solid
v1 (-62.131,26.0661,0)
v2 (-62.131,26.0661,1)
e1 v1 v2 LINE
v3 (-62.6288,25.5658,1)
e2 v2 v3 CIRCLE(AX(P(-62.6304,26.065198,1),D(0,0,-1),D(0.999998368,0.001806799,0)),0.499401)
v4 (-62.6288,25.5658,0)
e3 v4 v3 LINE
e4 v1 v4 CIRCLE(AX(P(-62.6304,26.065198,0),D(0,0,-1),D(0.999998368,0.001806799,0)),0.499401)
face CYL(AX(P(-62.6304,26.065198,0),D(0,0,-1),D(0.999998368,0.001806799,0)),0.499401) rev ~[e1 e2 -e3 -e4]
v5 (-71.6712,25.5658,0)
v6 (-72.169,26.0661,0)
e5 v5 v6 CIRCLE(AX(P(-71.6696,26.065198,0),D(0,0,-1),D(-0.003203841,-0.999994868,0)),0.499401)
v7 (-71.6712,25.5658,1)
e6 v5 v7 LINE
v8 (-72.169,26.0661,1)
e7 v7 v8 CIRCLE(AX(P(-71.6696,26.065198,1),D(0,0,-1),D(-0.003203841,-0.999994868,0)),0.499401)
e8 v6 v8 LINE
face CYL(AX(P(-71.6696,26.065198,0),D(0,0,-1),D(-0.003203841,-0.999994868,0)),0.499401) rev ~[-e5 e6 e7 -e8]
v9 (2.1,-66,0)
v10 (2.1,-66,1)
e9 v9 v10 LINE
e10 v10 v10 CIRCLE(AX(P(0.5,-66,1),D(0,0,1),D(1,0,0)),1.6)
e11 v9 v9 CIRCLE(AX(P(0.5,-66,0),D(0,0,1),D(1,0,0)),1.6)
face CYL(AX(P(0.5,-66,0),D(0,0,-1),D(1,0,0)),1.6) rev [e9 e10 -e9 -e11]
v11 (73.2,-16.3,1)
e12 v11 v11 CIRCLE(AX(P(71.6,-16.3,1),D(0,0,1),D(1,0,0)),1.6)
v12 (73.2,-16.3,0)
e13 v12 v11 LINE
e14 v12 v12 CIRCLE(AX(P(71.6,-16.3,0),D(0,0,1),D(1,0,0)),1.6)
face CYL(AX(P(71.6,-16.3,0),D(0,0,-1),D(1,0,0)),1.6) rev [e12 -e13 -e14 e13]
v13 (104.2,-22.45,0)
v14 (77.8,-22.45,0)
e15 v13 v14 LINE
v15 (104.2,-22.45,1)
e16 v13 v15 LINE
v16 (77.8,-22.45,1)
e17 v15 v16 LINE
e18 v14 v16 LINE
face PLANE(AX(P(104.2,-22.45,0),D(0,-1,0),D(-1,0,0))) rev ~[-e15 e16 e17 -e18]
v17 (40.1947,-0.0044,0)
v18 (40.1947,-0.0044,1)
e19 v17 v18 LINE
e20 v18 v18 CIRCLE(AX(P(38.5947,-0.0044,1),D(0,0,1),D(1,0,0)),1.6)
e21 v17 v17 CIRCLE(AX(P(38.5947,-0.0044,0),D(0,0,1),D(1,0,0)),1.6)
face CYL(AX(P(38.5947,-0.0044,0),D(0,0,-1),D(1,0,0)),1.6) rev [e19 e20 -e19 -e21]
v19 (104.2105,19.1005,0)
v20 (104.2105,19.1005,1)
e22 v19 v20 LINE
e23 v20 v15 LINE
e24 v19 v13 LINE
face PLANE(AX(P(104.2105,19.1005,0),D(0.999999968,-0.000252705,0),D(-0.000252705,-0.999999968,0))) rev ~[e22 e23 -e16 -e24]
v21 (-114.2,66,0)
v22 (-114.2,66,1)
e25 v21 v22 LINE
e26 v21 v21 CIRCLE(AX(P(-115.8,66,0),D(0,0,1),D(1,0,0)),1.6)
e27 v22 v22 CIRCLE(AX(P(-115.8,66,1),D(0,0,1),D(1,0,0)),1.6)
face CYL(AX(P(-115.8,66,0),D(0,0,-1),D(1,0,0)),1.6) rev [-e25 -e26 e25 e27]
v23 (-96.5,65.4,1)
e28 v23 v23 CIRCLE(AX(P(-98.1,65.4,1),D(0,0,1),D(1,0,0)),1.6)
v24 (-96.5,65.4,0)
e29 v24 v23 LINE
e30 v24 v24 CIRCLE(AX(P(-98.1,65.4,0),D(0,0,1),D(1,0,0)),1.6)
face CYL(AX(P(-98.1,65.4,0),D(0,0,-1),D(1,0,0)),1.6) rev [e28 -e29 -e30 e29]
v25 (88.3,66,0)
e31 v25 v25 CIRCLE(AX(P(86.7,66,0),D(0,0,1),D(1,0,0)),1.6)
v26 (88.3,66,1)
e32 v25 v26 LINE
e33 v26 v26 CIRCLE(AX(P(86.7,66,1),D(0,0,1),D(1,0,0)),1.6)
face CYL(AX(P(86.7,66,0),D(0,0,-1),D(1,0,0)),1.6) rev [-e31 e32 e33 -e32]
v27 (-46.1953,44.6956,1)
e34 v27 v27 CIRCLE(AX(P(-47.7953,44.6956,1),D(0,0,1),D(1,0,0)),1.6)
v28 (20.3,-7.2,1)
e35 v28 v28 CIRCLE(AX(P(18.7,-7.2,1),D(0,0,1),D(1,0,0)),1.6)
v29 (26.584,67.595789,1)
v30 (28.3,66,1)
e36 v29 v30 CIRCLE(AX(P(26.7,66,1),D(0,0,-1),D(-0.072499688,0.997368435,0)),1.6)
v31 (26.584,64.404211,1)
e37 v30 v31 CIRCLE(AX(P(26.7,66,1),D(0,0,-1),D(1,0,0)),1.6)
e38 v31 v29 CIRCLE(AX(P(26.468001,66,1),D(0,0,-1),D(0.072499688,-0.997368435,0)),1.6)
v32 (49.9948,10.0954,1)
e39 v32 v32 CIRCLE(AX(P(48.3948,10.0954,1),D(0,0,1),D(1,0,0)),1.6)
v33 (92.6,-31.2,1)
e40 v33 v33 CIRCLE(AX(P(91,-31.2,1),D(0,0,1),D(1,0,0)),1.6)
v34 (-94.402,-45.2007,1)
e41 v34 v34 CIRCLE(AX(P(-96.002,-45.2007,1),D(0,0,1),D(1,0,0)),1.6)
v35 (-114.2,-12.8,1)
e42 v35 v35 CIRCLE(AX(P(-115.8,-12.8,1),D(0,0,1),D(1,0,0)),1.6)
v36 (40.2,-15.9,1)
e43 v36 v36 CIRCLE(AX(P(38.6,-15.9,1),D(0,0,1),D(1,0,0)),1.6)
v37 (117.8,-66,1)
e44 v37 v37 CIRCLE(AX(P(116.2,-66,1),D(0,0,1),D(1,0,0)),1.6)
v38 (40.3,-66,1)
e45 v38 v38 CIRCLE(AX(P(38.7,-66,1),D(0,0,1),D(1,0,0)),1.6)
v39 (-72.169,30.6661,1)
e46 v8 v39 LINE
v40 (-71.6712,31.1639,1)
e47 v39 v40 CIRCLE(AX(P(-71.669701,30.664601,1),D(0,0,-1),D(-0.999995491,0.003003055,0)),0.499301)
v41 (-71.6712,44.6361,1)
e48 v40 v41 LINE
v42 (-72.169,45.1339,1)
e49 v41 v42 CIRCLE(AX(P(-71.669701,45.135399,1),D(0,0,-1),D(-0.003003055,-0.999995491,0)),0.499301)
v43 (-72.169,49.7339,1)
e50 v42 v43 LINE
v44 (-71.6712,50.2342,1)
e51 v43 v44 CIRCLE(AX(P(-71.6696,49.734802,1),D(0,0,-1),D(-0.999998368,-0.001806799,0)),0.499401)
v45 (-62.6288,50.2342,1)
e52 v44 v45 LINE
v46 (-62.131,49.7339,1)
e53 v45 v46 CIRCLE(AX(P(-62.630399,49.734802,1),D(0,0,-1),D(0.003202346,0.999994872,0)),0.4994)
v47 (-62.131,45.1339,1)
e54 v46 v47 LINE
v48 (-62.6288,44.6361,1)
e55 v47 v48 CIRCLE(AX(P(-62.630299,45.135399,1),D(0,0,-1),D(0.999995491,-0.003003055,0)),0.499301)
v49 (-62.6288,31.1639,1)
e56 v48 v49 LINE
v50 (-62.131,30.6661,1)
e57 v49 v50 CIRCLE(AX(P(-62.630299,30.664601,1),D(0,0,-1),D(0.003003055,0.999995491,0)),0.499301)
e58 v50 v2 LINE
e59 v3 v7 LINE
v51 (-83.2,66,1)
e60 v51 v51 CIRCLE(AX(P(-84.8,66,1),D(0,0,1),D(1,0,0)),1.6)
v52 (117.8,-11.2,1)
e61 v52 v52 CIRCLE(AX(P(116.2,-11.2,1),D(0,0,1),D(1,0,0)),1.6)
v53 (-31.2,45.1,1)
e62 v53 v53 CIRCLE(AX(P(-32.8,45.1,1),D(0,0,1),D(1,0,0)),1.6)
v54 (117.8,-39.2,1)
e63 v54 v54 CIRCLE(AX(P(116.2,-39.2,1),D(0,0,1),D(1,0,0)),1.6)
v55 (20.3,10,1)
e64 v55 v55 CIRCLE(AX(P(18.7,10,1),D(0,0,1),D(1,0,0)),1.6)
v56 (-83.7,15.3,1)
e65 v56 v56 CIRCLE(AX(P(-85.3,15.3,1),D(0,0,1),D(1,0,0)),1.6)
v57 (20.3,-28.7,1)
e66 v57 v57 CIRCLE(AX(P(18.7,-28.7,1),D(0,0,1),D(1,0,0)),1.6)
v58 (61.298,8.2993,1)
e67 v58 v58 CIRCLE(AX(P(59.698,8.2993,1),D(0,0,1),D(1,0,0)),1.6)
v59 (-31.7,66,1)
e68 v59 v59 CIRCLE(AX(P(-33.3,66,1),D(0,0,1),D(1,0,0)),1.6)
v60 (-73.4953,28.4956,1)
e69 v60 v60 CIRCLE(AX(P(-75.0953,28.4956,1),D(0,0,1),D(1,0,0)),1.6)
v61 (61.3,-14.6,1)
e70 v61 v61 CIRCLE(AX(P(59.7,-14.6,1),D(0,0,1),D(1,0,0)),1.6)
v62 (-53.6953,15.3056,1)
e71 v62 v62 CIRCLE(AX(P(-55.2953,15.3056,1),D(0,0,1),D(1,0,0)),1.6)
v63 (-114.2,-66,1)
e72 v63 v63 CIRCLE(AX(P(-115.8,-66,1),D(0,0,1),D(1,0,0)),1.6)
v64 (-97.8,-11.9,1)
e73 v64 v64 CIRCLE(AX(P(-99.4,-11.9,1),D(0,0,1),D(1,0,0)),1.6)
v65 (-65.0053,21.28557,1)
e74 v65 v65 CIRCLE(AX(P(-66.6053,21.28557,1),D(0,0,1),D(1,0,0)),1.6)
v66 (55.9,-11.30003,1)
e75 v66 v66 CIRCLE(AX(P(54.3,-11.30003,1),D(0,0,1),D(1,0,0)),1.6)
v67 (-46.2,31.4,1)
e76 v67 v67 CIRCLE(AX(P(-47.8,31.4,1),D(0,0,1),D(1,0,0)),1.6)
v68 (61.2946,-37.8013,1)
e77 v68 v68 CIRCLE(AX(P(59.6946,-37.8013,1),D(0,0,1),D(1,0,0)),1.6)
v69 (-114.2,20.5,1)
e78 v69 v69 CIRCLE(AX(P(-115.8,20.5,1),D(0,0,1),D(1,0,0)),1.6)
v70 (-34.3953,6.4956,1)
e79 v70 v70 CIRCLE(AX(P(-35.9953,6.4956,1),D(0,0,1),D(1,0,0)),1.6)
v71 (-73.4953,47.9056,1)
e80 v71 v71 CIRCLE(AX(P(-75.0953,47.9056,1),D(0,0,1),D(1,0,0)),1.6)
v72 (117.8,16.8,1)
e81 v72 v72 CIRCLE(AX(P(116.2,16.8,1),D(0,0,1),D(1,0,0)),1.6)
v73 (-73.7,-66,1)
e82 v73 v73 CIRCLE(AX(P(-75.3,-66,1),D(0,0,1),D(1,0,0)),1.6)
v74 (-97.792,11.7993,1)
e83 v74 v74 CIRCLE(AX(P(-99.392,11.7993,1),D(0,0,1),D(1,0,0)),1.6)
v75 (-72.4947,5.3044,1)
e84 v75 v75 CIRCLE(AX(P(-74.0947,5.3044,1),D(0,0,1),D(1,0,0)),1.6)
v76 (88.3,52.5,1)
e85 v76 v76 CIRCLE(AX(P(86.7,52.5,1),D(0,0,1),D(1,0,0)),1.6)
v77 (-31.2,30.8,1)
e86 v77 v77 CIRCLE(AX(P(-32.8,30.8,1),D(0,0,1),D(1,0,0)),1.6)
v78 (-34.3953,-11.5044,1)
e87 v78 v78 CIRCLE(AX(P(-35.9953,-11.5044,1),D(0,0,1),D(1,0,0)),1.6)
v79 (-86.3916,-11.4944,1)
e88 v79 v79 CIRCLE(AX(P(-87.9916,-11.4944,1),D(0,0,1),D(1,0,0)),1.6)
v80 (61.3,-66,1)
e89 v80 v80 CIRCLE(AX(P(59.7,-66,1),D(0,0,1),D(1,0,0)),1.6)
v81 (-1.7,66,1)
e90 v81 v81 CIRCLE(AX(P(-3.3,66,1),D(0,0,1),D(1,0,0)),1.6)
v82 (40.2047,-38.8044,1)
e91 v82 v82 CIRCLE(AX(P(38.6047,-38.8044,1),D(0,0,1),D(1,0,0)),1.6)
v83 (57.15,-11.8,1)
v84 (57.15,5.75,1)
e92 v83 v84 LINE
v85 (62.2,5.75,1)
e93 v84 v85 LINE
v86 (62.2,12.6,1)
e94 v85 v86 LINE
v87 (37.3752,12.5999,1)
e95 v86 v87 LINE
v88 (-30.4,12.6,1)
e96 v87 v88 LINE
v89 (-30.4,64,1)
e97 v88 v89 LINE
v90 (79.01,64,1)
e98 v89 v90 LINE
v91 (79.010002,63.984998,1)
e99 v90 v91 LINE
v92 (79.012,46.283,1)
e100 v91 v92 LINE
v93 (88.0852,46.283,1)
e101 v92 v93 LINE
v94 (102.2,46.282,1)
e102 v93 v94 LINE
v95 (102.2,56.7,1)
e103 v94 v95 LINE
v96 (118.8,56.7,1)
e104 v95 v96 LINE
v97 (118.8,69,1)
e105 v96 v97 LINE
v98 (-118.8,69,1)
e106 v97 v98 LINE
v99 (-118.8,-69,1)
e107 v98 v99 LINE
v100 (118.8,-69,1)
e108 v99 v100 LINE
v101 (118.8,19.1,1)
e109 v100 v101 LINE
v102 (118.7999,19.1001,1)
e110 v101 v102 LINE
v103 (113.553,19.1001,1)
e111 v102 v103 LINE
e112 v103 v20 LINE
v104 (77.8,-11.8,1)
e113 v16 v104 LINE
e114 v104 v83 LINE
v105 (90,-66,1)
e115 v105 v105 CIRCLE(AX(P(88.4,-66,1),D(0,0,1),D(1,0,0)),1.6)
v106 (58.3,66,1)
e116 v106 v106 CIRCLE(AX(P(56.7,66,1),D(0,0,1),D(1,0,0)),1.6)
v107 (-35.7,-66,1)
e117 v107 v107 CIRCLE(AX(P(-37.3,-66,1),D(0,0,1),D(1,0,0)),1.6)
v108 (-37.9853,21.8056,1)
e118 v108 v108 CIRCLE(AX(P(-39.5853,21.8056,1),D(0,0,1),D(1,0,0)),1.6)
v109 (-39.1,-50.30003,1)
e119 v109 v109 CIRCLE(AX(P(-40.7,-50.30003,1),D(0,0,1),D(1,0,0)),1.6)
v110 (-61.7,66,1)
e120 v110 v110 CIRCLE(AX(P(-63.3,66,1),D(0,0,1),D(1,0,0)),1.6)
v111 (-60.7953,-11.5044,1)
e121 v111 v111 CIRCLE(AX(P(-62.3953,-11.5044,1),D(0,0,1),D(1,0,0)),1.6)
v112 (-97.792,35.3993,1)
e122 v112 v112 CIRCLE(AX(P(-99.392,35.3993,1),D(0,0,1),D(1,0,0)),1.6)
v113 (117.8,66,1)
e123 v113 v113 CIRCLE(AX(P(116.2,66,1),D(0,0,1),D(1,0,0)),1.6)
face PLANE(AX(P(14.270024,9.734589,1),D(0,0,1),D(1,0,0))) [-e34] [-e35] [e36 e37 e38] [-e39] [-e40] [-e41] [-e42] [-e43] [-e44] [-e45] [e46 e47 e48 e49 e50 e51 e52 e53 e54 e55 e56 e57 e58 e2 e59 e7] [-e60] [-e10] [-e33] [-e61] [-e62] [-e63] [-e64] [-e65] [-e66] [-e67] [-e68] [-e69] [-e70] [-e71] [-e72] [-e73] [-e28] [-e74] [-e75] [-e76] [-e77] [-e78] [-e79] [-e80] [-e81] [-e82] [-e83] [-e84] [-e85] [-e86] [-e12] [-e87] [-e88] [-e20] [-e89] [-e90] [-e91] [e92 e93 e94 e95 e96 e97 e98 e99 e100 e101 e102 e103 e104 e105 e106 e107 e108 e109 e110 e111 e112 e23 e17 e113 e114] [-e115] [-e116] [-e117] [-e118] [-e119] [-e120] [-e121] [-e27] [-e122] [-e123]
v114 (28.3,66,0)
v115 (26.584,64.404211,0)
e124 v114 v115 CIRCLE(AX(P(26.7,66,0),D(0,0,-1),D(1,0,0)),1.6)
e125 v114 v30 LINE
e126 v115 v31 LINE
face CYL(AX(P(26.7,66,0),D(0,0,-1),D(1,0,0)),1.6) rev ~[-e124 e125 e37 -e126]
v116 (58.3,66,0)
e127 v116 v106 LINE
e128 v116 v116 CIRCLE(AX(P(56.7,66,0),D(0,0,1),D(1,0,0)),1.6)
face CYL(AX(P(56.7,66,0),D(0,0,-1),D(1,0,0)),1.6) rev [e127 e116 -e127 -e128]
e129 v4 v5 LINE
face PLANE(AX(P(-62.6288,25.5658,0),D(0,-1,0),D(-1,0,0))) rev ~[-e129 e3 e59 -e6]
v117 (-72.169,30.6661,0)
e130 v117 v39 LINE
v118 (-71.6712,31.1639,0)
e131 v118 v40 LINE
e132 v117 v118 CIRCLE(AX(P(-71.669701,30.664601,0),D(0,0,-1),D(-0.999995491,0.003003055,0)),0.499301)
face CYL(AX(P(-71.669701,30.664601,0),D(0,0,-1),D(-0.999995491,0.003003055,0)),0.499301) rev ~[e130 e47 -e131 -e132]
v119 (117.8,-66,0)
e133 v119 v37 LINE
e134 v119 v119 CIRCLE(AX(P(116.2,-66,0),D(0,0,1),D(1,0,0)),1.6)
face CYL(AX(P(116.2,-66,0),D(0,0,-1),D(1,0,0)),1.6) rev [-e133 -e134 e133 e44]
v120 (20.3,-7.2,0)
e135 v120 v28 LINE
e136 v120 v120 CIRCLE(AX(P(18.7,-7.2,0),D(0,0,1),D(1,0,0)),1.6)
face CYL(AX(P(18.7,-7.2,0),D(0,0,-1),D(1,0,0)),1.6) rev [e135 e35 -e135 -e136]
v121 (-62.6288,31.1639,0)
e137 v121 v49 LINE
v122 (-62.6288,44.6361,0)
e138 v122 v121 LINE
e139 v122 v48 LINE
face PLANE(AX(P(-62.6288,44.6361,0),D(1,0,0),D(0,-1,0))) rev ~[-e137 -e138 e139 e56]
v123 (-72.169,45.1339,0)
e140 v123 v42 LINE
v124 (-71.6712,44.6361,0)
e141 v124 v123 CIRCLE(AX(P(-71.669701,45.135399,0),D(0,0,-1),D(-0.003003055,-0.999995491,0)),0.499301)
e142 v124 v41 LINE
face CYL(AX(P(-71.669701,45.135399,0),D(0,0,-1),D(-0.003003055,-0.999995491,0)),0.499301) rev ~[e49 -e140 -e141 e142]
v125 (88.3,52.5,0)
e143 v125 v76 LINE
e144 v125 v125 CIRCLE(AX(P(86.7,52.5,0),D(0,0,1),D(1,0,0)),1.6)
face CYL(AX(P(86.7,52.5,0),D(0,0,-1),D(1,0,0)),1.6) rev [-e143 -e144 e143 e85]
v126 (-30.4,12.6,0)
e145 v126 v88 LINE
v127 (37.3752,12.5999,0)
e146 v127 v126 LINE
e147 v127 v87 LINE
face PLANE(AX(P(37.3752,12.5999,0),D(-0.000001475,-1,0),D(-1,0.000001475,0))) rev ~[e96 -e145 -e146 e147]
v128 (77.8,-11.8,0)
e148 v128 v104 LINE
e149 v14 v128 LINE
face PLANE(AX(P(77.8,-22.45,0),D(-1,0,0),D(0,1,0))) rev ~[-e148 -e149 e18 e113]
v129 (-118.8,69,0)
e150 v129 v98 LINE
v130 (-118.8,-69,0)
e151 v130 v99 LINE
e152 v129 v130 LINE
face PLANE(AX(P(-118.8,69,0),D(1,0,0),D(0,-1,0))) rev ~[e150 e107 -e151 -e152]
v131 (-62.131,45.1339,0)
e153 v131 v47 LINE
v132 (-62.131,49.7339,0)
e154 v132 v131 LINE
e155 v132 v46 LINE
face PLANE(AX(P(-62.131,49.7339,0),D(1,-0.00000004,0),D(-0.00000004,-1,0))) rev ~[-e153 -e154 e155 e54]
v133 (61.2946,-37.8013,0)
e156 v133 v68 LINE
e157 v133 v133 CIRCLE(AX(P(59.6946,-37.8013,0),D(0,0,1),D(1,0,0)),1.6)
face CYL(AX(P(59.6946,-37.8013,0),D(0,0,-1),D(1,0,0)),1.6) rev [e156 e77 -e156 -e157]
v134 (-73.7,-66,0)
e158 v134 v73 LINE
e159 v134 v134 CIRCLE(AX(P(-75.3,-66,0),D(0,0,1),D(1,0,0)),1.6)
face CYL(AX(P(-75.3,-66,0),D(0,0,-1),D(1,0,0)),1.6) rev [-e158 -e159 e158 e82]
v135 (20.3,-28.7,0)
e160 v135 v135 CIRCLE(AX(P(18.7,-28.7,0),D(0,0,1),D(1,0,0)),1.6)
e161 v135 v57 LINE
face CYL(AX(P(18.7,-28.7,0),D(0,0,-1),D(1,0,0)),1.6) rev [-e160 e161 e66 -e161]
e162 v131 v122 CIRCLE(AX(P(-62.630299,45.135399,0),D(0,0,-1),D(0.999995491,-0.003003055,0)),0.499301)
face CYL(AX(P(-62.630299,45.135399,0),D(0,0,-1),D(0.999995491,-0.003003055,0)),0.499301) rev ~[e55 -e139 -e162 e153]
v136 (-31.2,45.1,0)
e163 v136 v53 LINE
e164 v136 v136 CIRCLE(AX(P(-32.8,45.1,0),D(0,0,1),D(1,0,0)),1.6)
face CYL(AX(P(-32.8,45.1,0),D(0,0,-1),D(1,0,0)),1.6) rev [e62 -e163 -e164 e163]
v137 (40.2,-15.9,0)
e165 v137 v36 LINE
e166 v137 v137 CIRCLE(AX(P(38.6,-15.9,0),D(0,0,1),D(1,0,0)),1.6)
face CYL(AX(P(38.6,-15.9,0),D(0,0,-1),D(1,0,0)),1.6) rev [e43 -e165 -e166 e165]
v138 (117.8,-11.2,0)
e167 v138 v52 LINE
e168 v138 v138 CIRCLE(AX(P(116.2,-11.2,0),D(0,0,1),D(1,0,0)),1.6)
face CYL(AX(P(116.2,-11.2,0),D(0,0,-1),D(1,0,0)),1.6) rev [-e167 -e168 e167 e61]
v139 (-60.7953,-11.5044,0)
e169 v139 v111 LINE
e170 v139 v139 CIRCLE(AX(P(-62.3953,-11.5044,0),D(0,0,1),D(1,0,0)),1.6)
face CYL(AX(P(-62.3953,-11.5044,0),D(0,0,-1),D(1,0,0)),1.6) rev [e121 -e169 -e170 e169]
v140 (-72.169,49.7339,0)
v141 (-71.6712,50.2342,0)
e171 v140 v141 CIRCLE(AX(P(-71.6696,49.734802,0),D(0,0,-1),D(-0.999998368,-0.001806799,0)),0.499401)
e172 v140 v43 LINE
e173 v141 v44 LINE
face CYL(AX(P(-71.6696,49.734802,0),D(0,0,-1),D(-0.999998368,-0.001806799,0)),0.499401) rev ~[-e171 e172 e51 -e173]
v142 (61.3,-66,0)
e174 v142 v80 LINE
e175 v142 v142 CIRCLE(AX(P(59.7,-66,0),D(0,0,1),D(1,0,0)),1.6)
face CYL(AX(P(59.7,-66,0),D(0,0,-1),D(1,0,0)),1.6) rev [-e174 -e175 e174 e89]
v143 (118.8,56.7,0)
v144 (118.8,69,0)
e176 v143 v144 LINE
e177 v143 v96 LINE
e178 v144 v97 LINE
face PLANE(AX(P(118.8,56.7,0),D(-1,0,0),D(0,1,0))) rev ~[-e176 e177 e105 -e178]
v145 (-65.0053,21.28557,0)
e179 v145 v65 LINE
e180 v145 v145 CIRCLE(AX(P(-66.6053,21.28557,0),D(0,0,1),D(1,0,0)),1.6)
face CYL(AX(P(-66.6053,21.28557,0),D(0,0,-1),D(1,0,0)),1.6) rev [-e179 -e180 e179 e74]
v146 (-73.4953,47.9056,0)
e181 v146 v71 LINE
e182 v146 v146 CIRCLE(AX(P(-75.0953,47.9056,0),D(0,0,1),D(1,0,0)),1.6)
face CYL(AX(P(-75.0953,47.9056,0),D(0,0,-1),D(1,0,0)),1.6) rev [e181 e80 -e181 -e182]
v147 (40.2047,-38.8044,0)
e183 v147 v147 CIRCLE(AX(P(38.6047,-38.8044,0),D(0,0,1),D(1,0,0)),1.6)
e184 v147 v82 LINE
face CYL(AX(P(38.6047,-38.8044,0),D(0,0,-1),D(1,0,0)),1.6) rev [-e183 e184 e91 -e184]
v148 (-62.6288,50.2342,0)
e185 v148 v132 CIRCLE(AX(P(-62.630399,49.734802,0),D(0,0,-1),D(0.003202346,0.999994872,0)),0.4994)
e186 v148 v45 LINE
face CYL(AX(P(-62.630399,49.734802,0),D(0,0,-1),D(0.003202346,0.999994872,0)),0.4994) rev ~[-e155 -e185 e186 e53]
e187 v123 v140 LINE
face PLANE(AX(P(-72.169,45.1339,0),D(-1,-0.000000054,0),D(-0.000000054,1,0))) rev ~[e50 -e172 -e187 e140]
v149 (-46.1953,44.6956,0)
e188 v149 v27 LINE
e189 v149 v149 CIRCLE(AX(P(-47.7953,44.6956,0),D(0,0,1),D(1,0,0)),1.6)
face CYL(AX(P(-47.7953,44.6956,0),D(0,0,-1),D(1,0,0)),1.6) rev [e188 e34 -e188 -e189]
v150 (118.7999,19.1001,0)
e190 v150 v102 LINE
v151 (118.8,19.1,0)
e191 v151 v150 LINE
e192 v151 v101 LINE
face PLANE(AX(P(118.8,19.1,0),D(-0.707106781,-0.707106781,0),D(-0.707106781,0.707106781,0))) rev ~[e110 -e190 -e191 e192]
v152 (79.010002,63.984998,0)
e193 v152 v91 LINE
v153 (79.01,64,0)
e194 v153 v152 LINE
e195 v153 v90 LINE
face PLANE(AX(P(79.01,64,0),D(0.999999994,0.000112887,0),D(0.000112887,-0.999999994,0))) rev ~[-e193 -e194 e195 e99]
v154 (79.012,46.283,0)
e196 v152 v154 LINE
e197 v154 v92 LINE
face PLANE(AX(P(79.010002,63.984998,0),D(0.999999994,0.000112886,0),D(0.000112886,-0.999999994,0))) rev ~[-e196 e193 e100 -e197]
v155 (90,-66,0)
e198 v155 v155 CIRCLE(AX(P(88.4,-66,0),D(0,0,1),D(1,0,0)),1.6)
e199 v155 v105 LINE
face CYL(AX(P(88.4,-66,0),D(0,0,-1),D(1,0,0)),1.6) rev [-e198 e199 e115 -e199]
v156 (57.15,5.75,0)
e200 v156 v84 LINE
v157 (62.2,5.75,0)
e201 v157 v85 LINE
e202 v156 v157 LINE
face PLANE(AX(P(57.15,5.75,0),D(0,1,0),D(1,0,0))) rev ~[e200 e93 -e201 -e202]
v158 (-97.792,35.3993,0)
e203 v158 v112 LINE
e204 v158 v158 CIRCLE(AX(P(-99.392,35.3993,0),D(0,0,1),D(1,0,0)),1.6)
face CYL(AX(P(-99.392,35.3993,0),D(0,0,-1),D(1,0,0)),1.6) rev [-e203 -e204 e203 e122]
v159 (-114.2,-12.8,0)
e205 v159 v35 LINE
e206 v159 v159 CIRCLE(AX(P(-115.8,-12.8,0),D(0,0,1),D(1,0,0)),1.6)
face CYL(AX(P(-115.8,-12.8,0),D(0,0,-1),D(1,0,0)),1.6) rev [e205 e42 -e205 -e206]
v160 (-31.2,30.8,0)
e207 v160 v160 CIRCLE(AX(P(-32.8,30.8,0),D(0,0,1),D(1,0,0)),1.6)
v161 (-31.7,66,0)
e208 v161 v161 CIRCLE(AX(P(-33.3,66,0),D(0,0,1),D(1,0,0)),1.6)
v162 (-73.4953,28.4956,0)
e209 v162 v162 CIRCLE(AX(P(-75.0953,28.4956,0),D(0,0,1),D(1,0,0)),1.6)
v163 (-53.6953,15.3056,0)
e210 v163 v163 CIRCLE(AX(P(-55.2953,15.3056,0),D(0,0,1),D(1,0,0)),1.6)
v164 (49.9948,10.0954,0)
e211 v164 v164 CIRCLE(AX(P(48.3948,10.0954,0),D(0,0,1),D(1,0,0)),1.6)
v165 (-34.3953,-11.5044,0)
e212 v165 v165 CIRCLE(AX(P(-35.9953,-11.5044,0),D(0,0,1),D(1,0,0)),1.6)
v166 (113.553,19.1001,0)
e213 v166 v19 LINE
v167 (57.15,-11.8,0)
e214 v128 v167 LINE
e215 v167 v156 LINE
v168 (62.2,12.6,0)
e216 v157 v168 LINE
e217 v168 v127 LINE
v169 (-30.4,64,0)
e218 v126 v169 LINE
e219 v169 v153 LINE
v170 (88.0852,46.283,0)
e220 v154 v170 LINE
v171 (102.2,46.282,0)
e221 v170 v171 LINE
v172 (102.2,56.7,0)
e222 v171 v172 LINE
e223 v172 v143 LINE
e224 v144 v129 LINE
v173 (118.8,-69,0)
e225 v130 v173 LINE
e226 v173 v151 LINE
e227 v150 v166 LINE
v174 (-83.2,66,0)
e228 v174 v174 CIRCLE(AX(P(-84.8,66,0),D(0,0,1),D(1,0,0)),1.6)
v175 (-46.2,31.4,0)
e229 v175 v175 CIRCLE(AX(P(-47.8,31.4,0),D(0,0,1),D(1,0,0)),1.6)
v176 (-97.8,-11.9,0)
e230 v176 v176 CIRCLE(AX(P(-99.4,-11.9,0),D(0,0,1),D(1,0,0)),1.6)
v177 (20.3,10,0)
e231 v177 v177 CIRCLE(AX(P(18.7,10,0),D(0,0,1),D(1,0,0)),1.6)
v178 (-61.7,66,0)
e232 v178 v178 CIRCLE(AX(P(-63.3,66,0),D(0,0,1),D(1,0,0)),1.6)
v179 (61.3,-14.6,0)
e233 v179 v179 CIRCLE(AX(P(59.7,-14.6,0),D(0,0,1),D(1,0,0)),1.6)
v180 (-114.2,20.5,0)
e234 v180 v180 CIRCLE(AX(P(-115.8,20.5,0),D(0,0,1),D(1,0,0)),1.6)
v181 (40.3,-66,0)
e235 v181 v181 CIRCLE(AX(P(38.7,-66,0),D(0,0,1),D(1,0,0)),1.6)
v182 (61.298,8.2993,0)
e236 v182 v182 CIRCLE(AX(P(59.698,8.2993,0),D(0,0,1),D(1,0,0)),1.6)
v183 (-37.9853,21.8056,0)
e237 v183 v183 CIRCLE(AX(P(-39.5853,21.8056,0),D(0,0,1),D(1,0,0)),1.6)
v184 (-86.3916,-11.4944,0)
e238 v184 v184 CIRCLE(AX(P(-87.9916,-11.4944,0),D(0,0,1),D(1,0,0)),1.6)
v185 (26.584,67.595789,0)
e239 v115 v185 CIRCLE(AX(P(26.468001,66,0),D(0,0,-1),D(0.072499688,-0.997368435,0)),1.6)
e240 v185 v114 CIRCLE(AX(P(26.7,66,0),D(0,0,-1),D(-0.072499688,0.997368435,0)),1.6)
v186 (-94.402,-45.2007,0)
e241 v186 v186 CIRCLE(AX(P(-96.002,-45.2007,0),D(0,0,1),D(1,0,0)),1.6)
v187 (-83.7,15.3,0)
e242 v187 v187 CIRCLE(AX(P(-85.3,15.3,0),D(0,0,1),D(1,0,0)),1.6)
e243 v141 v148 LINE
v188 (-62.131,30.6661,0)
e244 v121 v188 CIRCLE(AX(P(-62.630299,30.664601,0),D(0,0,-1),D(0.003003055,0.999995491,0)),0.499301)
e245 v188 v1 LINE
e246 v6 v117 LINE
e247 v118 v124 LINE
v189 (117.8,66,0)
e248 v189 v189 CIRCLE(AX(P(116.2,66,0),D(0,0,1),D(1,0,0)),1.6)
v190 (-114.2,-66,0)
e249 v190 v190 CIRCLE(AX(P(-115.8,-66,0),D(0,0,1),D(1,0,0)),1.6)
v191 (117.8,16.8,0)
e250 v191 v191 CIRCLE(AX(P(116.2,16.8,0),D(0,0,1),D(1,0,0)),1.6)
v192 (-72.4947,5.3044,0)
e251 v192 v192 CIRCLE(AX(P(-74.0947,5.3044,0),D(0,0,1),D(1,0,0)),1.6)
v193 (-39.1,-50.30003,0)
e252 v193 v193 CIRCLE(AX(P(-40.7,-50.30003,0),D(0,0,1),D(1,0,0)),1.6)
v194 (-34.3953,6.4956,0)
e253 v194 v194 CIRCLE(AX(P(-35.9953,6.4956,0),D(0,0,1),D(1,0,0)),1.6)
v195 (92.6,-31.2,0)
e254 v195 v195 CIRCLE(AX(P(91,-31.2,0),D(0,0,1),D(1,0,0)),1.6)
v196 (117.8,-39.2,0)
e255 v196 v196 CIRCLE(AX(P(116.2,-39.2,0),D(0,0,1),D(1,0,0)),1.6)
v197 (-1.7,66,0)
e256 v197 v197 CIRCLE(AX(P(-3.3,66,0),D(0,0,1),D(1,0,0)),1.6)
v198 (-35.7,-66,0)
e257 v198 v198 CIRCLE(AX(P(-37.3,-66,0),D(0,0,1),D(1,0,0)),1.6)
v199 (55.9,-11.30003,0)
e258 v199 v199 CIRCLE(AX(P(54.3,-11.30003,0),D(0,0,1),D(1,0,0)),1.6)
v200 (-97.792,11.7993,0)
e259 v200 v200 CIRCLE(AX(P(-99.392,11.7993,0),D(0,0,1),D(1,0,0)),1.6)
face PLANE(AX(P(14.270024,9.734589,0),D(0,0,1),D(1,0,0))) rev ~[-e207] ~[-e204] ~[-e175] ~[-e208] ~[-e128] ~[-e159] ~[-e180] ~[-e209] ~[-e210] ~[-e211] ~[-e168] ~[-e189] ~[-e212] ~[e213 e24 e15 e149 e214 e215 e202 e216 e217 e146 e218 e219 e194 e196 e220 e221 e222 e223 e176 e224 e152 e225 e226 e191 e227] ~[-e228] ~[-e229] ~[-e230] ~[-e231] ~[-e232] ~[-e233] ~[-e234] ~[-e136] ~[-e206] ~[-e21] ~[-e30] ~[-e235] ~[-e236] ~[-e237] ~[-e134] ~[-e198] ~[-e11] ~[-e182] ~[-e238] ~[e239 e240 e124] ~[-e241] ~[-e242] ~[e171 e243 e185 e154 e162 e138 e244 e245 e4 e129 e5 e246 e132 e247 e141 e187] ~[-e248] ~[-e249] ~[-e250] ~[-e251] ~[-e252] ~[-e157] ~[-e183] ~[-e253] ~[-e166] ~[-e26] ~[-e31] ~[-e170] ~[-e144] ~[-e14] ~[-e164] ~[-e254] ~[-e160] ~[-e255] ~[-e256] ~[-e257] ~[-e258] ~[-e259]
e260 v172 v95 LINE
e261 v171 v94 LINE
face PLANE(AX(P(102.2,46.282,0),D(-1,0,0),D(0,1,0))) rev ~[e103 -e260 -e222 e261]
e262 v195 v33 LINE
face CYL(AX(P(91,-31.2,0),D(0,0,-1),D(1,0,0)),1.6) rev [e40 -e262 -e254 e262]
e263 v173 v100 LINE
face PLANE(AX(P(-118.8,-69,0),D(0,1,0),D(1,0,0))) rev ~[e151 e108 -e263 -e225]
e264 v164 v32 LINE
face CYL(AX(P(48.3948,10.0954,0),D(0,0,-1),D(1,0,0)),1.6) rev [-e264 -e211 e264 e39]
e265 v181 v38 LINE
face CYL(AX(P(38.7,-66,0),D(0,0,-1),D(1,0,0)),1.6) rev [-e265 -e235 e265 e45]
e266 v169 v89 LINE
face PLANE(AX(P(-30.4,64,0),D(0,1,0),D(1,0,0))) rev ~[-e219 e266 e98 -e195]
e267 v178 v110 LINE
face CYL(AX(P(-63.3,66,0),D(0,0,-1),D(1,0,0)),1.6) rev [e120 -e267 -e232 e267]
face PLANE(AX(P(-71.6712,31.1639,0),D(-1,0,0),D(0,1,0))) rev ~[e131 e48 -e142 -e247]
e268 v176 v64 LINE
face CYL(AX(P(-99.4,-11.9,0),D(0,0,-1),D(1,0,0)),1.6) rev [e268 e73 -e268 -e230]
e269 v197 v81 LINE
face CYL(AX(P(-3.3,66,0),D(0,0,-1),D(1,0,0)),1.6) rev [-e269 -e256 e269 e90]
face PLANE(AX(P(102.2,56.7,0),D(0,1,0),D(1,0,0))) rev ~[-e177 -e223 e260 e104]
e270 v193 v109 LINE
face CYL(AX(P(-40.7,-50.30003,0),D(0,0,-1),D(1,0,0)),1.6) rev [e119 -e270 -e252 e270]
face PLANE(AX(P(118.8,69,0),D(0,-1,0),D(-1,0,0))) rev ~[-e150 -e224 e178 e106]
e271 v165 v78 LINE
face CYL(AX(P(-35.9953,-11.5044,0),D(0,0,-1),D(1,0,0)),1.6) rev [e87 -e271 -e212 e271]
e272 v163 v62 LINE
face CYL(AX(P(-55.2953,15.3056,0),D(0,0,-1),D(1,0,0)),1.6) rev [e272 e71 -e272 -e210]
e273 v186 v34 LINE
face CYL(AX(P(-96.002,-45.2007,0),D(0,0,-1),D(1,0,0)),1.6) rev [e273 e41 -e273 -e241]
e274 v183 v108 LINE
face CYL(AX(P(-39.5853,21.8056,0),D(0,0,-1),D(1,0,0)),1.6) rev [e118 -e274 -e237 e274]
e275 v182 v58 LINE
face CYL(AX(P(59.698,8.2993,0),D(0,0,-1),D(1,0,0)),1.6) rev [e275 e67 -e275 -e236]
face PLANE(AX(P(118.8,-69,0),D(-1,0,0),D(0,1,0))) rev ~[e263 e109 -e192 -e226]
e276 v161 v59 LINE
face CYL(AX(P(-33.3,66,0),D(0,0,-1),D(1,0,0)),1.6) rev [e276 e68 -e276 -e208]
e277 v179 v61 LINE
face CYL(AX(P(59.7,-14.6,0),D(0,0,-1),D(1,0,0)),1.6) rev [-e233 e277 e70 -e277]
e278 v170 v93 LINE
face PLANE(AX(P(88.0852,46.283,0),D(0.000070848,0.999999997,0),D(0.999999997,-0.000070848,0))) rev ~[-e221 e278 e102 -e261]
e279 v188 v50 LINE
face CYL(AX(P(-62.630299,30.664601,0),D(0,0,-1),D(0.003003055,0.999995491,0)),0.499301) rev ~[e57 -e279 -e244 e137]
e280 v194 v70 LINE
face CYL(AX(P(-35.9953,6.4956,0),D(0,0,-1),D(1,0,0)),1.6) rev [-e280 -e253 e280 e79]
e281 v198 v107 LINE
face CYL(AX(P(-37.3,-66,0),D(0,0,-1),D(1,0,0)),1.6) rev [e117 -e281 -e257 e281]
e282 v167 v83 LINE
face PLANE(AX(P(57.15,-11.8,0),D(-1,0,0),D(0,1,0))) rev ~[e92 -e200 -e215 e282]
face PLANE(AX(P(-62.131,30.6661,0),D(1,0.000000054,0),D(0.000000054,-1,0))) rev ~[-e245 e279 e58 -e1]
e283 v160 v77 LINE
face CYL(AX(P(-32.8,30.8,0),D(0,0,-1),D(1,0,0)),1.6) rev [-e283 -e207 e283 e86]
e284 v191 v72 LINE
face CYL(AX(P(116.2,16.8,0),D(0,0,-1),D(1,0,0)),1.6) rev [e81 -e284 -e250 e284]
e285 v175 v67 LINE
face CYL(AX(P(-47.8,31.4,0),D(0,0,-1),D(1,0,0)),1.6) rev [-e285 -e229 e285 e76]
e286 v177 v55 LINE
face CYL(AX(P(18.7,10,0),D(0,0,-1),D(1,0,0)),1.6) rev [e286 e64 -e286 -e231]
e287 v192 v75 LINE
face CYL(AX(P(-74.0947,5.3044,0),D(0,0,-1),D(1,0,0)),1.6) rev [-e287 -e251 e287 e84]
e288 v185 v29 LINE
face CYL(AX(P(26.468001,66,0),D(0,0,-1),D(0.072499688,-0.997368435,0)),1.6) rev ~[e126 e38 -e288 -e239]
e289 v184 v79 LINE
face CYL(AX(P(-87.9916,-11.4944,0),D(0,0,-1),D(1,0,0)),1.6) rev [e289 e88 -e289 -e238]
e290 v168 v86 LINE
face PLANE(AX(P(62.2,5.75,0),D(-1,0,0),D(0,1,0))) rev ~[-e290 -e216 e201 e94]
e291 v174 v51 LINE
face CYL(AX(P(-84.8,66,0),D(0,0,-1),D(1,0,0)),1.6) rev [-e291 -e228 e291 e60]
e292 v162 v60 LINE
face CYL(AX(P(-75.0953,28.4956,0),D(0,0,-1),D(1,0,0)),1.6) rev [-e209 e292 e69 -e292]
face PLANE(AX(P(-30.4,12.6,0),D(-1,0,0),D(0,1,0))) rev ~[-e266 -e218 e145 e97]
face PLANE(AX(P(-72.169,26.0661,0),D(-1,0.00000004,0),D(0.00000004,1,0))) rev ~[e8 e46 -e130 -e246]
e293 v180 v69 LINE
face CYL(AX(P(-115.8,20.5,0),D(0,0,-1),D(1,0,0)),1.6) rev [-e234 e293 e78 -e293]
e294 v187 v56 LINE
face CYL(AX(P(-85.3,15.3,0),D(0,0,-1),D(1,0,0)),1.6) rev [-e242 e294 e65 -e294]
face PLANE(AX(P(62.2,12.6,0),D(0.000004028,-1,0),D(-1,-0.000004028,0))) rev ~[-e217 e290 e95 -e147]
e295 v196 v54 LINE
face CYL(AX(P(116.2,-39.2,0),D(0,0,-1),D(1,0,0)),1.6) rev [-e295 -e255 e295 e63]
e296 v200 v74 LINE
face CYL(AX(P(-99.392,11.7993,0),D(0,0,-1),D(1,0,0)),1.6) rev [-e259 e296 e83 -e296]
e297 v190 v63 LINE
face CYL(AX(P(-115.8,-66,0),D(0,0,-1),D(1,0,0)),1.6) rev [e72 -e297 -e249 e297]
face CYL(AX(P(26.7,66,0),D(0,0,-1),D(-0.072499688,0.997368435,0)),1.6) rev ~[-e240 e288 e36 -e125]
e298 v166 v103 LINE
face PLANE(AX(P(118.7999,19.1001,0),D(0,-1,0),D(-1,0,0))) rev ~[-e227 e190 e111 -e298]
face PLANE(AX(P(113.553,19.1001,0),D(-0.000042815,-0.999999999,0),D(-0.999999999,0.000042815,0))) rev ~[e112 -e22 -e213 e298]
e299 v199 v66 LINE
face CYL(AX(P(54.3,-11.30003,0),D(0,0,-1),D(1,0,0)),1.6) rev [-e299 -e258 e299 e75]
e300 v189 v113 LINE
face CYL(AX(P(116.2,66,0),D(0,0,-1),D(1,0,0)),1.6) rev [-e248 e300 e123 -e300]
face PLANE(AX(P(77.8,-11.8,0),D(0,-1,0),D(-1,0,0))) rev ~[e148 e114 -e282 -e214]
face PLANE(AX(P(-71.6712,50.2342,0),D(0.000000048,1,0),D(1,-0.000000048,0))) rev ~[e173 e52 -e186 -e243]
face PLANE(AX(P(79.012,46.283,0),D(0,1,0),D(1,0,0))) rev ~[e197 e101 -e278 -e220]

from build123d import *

# Parameters (mm, degrees)
F0_R     = 1.6
F1_DEPTH = 1


# Not quite as in the source:
# - ends of sketch curves that miss each other by under 0.0002 mm in the source are joined


with BuildPart() as f1:
    # F0 (on Top) → F1 (new body)
    with BuildSketch(Plane.XY):
        Polygon((102.2, 56.7), (113.5, 56.7), (118.8, 56.7), (118.8, 69), (-118.8, 69), (-118.8, -69), (118.8, -69), (118.8, 19.1), (118.7999, 19.1001), (113.553, 19.1001), (104.2105, 19.1005), (104.2, -22.45), (88.8825, -22.45), (77.8, -22.45), (77.8, -11.8), (57.15, -11.8), (57.15, 5.75), (62.2, 5.75), (62.2, 12.6), (37.3752, 12.5999), (-30.4, 12.6), (-30.4, 64), (37.3639, 64), (61.18, 64), (78.995, 64), (79.01, 64), (79.0100016935, 63.9849983065), (79.012, 46.283), (88.0852, 46.283), (102.2, 46.282), align=None)
        with Locations((-115.8, -66)):
            Circle(F0_R, mode=Mode.SUBTRACT)
        with Locations((-75.3, -66)):
            Circle(F0_R, mode=Mode.SUBTRACT)
        with Locations((-96.002, -45.2007)):
            Circle(F0_R, mode=Mode.SUBTRACT)
        with Locations((-37.3, -66)):
            Circle(F0_R, mode=Mode.SUBTRACT)
        with Locations((-40.7, -50.30003)):
            Circle(F0_R, mode=Mode.SUBTRACT)
        with Locations((-115.8, -12.8)):
            Circle(F0_R, mode=Mode.SUBTRACT)
        with Locations((-99.4, -11.9)):
            Circle(F0_R, mode=Mode.SUBTRACT)
        with Locations((-87.9916, -11.4944)):
            Circle(F0_R, mode=Mode.SUBTRACT)
        with Locations((-62.3953, -11.5044)):
            Circle(F0_R, mode=Mode.SUBTRACT)
        with Locations((-35.9953, -11.5044)):
            Circle(F0_R, mode=Mode.SUBTRACT)
        with Locations((0.5, -66)):
            Circle(F0_R, mode=Mode.SUBTRACT)
        with Locations((38.7, -66)):
            Circle(F0_R, mode=Mode.SUBTRACT)
        with Locations((38.6047, -38.8044)):
            Circle(F0_R, mode=Mode.SUBTRACT)
        with Locations((59.7, -66)):
            Circle(F0_R, mode=Mode.SUBTRACT)
        with Locations((88.4, -66)):
            Circle(F0_R, mode=Mode.SUBTRACT)
        with Locations((116.2, -66)):
            Circle(F0_R, mode=Mode.SUBTRACT)
        with Locations((59.6946, -37.8013)):
            Circle(F0_R, mode=Mode.SUBTRACT)
        with Locations((116.2, -39.2)):
            Circle(F0_R, mode=Mode.SUBTRACT)
        with Locations((18.7, -28.7)):
            Circle(F0_R, mode=Mode.SUBTRACT)
        with Locations((18.7, -7.2)):
            Circle(F0_R, mode=Mode.SUBTRACT)
        with Locations((38.6, -15.9)):
            Circle(F0_R, mode=Mode.SUBTRACT)
        with Locations((54.3, -11.30003)):
            Circle(F0_R, mode=Mode.SUBTRACT)
        with Locations((38.5947, -0.0044)):
            Circle(F0_R, mode=Mode.SUBTRACT)
        with Locations((91, -31.2)):
            Circle(F0_R, mode=Mode.SUBTRACT)
        with Locations((59.7, -14.6)):
            Circle(F0_R, mode=Mode.SUBTRACT)
        with Locations((71.6, -16.3)):
            Circle(F0_R, mode=Mode.SUBTRACT)
        with Locations((116.2, -11.2)):
            Circle(F0_R, mode=Mode.SUBTRACT)
        with Locations((-99.392, 11.7993)):
            Circle(F0_R, mode=Mode.SUBTRACT)
        with Locations((-74.0947, 5.3044)):
            Circle(F0_R, mode=Mode.SUBTRACT)
        with Locations((-85.3, 15.3)):
            Circle(F0_R, mode=Mode.SUBTRACT)
        with Locations((-115.8, 20.5)):
            Circle(F0_R, mode=Mode.SUBTRACT)
        with Locations((-66.6053, 21.28557)):
            Circle(F0_R, mode=Mode.SUBTRACT)
        with Locations((-75.0953, 28.4956)):
            Circle(F0_R, mode=Mode.SUBTRACT)
        with Locations((-35.9953, 6.4956)):
            Circle(F0_R, mode=Mode.SUBTRACT)
        with Locations((-55.2953, 15.3056)):
            Circle(F0_R, mode=Mode.SUBTRACT)
        with Locations((-39.5853, 21.8056)):
            Circle(F0_R, mode=Mode.SUBTRACT)
        with Locations((-47.8, 31.4)):
            Circle(F0_R, mode=Mode.SUBTRACT)
        with Locations((-32.8, 30.8)):
            Circle(F0_R, mode=Mode.SUBTRACT)
        with Locations((-99.392, 35.3993)):
            Circle(F0_R, mode=Mode.SUBTRACT)
        with BuildLine():
            ThreePointArc((-71.6712000014, 25.5657995631), (-72.0236133171, 25.7129538657), (-72.1690001854, 26.0661000003))
            Line((-72.1690001854, 26.0661000003), (-72.169, 30.6661))
            ThreePointArc((-72.169, 30.6661), (-72.022760123, 31.017660123), (-71.6711999992, 31.1638997499))
            Line((-71.6711999992, 31.1638997499), (-71.6712, 44.6361))
            ThreePointArc((-71.6712, 44.6361), (-72.022760123, 44.782339877), (-72.1689997499, 45.1339000008))
            Line((-72.1689997499, 45.1339000008), (-72.169, 49.7339))
            ThreePointArc((-72.169, 49.7339), (-72.0236133171, 50.0870461343), (-71.6712000014, 50.2342004369))
            Line((-71.6712000014, 50.2342004369), (-62.6288, 50.2342))
            ThreePointArc((-62.6288, 50.2342), (-62.2763866829, 50.0870461343), (-62.1309998146, 49.7338999997))
            Line((-62.1309998146, 49.7338999997), (-62.131, 45.1339))
            ThreePointArc((-62.131, 45.1339), (-62.277239877, 44.782339877), (-62.6288000008, 44.6361002501))
            Line((-62.6288000008, 44.6361002501), (-62.6288, 31.1639))
            ThreePointArc((-62.6288, 31.1639), (-62.277239877, 31.017660123), (-62.1310002501, 30.6660999992))
            Line((-62.1310002501, 30.6660999992), (-62.131, 26.0661))
            ThreePointArc((-62.131, 26.0661), (-62.2763866829, 25.7129538657), (-62.6287999986, 25.5657995631))
            Line((-62.6287999986, 25.5657995631), (-71.6712000014, 25.5657995631))
        make_face(mode=Mode.SUBTRACT)
        with Locations((-75.0953, 47.9056)):
            Circle(F0_R, mode=Mode.SUBTRACT)
        with Locations((-115.8, 66)):
            Circle(F0_R, mode=Mode.SUBTRACT)
        with Locations((-98.1, 65.4)):
            Circle(F0_R, mode=Mode.SUBTRACT)
        with Locations((-84.8, 66)):
            Circle(F0_R, mode=Mode.SUBTRACT)
        with Locations((-63.3, 66)):
            Circle(F0_R, mode=Mode.SUBTRACT)
        with Locations((-47.7953, 44.6956)):
            Circle(F0_R, mode=Mode.SUBTRACT)
        with Locations((-32.8, 45.1)):
            Circle(F0_R, mode=Mode.SUBTRACT)
        with Locations((-33.3, 66)):
            Circle(F0_R, mode=Mode.SUBTRACT)
        with Locations((-3.3, 66)):
            Circle(F0_R, mode=Mode.SUBTRACT)
        with Locations((18.7, 10)):
            Circle(F0_R, mode=Mode.SUBTRACT)
        with Locations((48.3948, 10.0954)):
            Circle(F0_R, mode=Mode.SUBTRACT)
        with Locations((59.698, 8.2993)):
            Circle(F0_R, mode=Mode.SUBTRACT)
        with Locations((116.2, 16.8)):
            Circle(F0_R, mode=Mode.SUBTRACT)
        with BuildLine():
            ThreePointArc((26.5840005, 64.4042105039), (24.868001, 66), (26.5840005, 67.5957894961))
            ThreePointArc((26.5840005, 67.5957894961), (27.7895872613, 67.1716653106), (28.3, 66))
            ThreePointArc((28.3, 66), (27.7895872613, 64.8283346894), (26.5840005, 64.4042105039))
        make_face(mode=Mode.SUBTRACT)
        with Locations((56.7, 66)):
            Circle(F0_R, mode=Mode.SUBTRACT)
        with Locations((86.7, 52.5)):
            Circle(F0_R, mode=Mode.SUBTRACT)
        with Locations((86.7, 66)):
            Circle(F0_R, mode=Mode.SUBTRACT)
        with Locations((116.2, 66)):
            Circle(F0_R, mode=Mode.SUBTRACT)
    extrude(amount=F1_DEPTH)


solid = f1.part
